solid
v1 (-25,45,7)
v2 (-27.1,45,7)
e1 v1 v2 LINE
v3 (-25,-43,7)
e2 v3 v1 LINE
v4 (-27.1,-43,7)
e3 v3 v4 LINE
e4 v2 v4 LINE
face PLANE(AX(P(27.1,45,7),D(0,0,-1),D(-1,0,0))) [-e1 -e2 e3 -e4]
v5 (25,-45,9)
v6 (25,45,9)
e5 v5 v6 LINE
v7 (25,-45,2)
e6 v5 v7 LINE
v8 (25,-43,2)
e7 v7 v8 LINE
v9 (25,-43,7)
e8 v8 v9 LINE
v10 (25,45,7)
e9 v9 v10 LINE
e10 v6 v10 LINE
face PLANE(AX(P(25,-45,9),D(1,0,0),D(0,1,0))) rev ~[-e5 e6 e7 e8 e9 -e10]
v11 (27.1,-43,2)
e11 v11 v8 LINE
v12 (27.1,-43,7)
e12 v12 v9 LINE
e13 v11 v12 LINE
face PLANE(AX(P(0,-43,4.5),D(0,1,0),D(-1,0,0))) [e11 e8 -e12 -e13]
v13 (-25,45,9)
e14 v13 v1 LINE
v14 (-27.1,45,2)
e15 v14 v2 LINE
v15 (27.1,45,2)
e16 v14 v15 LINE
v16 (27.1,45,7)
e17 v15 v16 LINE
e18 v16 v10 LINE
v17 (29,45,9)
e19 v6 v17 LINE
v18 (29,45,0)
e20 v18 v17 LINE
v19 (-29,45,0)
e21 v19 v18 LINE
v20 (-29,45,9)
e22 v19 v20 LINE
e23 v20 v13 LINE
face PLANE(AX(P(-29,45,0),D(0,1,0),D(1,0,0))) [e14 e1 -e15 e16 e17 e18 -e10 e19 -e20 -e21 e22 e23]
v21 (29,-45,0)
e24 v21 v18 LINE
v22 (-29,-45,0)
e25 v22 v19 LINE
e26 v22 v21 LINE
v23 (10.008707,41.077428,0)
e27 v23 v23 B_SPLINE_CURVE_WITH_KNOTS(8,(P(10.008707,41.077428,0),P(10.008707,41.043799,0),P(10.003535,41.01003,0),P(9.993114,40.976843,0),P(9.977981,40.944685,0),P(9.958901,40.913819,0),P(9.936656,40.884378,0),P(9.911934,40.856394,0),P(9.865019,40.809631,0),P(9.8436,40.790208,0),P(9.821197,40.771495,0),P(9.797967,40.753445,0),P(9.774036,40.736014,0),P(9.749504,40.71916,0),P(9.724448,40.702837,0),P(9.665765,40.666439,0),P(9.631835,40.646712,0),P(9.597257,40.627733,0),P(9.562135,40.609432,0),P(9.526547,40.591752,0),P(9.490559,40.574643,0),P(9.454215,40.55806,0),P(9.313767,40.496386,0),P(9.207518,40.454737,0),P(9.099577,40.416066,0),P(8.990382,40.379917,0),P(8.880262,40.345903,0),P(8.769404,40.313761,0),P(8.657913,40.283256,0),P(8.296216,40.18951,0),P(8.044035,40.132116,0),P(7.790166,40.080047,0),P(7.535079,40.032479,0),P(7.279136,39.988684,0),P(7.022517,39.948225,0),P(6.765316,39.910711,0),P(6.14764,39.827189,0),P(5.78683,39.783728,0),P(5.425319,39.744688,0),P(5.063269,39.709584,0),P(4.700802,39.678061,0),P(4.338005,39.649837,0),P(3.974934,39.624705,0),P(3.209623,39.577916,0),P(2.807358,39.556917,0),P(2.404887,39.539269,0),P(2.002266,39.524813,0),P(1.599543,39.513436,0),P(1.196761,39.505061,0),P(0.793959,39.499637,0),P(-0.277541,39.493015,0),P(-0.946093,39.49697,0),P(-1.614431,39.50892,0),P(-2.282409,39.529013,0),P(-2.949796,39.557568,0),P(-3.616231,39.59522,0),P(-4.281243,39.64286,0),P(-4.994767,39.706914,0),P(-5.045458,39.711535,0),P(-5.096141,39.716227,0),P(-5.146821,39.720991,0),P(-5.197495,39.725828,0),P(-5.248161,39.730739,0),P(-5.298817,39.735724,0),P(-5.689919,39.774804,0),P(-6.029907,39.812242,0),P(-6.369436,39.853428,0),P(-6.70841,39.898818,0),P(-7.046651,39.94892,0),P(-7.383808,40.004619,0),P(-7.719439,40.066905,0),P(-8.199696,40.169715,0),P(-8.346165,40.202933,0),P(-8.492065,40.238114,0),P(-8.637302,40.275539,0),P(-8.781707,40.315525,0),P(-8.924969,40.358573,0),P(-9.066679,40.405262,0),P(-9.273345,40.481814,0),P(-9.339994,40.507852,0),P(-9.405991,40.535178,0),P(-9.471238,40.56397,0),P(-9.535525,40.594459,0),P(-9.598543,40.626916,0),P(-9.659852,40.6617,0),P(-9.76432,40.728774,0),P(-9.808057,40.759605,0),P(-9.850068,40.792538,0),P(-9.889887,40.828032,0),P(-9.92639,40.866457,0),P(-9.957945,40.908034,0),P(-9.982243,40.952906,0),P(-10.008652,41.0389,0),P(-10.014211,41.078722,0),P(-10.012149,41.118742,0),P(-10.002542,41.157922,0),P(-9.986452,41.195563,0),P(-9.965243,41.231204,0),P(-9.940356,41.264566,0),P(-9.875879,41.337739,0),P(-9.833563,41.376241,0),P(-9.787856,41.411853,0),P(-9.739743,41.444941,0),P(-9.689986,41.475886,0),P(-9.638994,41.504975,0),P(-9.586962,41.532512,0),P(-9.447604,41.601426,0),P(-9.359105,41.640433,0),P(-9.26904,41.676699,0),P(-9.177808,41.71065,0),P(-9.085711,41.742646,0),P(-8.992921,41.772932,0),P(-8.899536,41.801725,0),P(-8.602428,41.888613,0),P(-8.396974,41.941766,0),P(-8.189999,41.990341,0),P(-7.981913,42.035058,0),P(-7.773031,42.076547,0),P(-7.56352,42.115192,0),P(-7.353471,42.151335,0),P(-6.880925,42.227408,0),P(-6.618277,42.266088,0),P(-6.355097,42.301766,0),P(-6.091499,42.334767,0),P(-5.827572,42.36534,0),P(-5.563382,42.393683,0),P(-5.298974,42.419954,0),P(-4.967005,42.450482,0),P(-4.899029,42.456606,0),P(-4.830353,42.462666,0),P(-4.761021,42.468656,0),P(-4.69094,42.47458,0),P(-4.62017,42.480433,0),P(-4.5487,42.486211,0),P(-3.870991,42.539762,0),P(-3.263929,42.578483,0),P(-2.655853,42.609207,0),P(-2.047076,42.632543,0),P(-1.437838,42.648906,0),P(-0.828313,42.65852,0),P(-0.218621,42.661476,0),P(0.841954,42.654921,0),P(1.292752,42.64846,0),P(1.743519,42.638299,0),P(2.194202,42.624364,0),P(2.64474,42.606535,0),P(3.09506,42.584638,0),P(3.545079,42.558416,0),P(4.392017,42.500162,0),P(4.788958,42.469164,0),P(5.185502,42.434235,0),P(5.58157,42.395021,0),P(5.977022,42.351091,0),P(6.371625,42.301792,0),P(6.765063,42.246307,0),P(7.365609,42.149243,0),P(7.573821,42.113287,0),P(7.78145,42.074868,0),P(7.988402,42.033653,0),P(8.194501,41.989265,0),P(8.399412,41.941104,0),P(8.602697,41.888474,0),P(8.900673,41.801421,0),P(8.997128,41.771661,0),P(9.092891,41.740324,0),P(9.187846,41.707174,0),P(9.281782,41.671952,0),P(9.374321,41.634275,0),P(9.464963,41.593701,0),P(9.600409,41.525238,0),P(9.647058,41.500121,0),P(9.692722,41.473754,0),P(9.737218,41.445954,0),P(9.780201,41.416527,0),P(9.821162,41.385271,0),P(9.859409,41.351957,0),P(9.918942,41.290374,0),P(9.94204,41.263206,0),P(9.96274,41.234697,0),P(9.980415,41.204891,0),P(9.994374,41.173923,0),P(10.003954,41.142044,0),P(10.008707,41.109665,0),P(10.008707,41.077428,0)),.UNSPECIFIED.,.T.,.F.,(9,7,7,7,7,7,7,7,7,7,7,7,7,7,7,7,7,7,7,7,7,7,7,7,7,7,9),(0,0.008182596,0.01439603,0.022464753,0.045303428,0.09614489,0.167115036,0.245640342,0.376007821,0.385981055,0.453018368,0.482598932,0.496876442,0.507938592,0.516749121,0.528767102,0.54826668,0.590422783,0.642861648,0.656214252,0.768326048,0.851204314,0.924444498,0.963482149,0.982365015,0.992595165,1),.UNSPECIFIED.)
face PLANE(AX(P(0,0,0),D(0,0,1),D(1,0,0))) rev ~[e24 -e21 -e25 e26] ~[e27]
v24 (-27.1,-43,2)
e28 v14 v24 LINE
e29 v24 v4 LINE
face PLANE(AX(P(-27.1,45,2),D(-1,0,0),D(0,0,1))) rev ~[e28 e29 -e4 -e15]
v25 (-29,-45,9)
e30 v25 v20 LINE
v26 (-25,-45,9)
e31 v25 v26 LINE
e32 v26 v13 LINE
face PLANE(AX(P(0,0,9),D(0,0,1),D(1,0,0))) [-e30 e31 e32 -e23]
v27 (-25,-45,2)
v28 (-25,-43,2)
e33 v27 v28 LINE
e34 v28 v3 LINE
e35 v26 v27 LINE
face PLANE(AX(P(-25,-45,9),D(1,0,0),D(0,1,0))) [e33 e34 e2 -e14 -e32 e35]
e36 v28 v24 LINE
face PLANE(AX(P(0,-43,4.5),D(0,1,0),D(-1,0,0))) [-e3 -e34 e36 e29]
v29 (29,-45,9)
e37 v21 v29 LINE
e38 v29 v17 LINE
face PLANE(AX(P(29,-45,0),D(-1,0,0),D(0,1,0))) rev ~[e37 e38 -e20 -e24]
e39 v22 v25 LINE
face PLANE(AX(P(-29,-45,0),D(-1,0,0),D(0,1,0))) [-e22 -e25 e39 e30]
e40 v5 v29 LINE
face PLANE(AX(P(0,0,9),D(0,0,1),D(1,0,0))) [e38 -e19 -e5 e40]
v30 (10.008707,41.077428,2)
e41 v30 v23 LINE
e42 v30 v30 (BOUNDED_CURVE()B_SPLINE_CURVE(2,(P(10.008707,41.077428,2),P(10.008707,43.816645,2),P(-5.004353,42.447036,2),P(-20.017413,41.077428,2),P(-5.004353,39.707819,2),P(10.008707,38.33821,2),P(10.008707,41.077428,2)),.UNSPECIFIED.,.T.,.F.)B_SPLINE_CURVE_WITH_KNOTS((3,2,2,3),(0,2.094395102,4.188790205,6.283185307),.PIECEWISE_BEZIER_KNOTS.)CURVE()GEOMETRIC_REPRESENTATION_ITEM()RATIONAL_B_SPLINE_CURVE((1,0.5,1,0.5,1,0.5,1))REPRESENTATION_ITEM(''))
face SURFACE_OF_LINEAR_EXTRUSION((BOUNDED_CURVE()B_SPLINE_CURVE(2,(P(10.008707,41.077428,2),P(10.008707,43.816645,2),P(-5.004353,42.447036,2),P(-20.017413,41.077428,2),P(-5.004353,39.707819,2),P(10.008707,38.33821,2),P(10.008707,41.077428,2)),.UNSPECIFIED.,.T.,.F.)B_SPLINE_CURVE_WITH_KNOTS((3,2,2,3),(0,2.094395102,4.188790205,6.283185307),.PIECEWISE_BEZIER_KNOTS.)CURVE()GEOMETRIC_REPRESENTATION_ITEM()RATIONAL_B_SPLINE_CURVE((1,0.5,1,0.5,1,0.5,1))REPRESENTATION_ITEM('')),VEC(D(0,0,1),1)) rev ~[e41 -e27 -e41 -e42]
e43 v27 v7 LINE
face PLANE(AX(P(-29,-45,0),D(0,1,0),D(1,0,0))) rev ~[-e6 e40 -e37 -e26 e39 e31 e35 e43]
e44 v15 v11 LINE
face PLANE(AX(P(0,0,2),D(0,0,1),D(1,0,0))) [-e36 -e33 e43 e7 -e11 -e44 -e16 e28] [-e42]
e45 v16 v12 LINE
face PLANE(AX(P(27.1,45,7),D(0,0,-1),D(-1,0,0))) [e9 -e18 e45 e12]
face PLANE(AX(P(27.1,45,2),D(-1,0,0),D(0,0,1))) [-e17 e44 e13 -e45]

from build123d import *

# Parameters (mm, degrees)
F0_W     = 58
F0_H     = 90
F1_DEPTH = 9
F2_W     = 50
F2_H     = 90
F3_DEPTH = 7
F4_W     = 54.2
F4_H     = 5
F5_DEPTH = 88
F7_DEPTH = 25


# Not quite as in the source:
# - a feature names something its author has since deleted; it is built from what else it names


with BuildPart() as f1:
    # F0 (on Top) → F1 (new body)
    with BuildSketch(Plane.XY):
        Rectangle(F0_W, F0_H)
    extrude(amount=F1_DEPTH)

    # F2 (on face) → F3 (cut)
    with BuildSketch(Plane.XY.offset(9)):
        Rectangle(F2_W, F2_H)
    extrude(amount=-F3_DEPTH, mode=Mode.SUBTRACT)

    # F4 (on face) → F5 (cut)
    with BuildSketch(Plane(origin=(0, 45, 0), x_dir=(-1, 0, 0), z_dir=(0, 1, 0))):
        with Locations((0, 4.5)):
            Rectangle(F4_W, F4_H)
    extrude(amount=-F5_DEPTH, mode=Mode.SUBTRACT)

    # F6 (on face) → F7 (cut)
    with BuildSketch(Plane.XY.offset(2)):
        with BuildLine():
            add(Edge.make_bspline(
                [(10.0087067112, 41.0774275661), (10.0087067112, 43.8166453426), (-5.0043533556, 42.4470364543), (-20.0174134225, 41.0774275661), (-5.0043533556, 39.7078186778), (10.0087067112, 38.3382097895), (10.0087067112, 41.0774275661)],
                knots=[0, 0, 0, 2.0943951024, 2.0943951024, 4.1887902048, 4.1887902048, 6.2831853072, 6.2831853072, 6.2831853072], degree=2, weights=[1, 0.5, 1, 0.5, 1, 0.5, 1]))
        make_face()
    extrude(amount=-F7_DEPTH, mode=Mode.SUBTRACT)


solid = f1.part
